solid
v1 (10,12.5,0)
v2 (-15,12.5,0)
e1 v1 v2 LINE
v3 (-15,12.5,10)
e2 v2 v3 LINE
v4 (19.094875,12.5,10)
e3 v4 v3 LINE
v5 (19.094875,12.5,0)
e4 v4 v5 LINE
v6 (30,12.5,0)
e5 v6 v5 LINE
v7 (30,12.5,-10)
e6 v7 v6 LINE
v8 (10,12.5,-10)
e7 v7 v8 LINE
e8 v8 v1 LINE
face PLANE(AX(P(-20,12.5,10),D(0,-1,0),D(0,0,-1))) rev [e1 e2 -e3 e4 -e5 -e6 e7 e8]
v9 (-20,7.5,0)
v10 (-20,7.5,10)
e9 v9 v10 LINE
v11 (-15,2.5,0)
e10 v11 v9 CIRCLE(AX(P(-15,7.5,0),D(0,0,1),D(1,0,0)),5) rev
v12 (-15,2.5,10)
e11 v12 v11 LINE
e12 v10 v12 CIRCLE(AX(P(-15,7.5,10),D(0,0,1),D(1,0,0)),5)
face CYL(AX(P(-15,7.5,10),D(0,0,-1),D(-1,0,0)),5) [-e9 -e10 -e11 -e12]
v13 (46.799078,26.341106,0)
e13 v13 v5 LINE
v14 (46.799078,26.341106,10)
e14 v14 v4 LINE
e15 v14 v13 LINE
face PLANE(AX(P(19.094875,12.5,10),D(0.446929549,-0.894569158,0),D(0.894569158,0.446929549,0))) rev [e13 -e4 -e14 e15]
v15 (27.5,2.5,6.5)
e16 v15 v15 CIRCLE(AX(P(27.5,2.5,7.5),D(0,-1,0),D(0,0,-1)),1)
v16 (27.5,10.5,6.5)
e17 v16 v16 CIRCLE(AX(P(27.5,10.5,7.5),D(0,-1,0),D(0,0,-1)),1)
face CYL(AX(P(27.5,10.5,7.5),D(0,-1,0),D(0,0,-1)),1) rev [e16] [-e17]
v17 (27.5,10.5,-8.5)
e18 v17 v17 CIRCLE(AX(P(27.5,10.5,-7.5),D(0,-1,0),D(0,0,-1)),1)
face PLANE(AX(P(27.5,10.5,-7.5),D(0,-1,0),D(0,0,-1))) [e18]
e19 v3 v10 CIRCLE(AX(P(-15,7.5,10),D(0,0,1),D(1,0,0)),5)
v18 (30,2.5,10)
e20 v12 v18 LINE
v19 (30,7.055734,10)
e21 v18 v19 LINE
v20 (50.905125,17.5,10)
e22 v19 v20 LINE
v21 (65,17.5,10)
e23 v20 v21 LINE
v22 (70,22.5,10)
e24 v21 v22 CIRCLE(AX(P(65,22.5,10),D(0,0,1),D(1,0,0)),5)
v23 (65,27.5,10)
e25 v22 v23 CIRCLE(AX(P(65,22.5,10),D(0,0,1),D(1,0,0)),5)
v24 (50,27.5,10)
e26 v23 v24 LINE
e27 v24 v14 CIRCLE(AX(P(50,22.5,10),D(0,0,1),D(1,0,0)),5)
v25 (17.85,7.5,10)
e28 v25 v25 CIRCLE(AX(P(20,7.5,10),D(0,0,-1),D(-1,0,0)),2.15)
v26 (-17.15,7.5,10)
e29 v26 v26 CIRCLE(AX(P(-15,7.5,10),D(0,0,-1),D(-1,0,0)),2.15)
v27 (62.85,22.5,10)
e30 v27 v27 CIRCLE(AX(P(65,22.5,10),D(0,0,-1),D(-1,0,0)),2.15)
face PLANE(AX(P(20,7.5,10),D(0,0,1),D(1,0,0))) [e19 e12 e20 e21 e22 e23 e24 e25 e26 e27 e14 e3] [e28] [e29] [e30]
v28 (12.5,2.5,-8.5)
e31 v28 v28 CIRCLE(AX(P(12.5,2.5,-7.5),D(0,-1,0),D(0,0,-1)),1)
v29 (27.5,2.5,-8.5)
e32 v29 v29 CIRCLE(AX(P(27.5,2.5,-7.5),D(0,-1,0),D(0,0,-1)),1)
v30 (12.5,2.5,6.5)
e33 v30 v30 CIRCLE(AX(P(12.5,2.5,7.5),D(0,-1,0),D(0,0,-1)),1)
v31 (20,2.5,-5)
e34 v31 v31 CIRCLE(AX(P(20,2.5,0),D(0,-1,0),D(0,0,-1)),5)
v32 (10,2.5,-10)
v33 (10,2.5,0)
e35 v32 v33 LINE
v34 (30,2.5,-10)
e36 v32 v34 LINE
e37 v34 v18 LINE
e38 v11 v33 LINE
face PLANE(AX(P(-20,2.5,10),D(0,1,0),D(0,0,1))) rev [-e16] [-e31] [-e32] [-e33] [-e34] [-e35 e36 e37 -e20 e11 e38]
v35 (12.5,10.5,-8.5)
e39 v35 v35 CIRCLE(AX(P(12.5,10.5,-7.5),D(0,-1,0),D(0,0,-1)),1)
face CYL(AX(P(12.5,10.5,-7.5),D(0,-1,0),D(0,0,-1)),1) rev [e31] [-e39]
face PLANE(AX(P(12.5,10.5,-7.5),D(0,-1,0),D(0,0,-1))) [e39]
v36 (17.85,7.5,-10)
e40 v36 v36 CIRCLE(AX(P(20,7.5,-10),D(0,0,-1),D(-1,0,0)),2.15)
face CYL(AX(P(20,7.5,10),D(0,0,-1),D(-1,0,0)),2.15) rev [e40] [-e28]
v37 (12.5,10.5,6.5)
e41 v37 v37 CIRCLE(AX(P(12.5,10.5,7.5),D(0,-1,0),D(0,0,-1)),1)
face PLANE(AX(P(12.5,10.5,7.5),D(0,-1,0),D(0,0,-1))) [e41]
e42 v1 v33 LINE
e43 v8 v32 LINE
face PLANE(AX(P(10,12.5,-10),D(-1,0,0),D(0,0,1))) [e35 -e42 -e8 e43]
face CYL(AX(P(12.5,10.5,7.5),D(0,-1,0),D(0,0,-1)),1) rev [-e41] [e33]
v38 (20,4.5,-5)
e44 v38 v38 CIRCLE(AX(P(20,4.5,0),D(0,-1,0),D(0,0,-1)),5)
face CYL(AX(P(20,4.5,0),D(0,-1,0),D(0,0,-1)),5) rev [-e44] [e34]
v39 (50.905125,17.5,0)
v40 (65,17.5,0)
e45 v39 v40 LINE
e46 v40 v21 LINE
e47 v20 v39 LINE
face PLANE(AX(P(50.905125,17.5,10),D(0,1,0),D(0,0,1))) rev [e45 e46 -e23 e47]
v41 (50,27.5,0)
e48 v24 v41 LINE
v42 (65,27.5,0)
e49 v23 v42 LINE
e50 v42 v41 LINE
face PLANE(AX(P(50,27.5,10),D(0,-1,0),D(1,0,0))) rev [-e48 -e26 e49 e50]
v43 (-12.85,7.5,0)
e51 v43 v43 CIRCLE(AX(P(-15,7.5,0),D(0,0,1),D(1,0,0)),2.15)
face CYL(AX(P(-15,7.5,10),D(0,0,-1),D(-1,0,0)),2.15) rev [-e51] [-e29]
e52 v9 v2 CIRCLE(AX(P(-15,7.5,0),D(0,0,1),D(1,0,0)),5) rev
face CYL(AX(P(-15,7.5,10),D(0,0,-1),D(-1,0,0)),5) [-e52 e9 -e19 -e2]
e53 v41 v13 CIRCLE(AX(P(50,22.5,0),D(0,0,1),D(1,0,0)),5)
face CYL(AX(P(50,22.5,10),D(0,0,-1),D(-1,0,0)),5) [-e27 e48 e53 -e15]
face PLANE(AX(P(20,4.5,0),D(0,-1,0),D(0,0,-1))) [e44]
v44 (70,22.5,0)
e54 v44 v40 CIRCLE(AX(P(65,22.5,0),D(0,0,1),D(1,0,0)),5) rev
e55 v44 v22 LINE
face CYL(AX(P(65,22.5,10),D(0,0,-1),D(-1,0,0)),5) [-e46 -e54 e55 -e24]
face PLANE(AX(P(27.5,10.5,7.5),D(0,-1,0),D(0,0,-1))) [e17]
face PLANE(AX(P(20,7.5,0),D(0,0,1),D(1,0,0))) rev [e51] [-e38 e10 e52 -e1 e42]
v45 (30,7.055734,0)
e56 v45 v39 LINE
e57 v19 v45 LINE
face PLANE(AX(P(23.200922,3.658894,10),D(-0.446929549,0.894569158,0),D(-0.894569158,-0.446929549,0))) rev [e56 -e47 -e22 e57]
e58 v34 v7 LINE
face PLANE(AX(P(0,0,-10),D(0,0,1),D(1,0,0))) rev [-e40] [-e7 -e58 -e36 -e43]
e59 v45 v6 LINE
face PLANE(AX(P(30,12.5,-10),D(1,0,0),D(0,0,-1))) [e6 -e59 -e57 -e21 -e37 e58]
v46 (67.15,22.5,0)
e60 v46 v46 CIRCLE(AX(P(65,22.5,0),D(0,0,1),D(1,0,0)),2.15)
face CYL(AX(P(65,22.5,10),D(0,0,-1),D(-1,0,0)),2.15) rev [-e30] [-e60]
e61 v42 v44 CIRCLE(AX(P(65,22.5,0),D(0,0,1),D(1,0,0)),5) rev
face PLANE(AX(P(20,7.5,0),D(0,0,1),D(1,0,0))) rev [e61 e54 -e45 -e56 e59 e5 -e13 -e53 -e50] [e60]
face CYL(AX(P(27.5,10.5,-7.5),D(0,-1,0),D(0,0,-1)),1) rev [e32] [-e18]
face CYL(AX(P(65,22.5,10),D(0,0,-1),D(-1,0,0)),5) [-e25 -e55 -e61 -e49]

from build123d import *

# Parameters (mm, degrees)
EXTRUDE_1_DEPTH     = 10
SKETCH_3_W          = 20
SKETCH_3_H          = 10
EXTRUDE_2_DEPTH     = 20
FILLET_1_R          = 5
SKETCH_5_R          = 2.15
CUT_EXTRUDE_2_DEPTH = 78.821912081
SKETCH_9_R          = 1
CUT_EXTRUDE_4_DEPTH = 8
SKETCH_10_R         = 5
CUT_EXTRUDE_8_DEPTH = 2


with BuildPart() as part:
    # 스케치2 → 보스-돌출1 (new body)
    with BuildSketch(Plane.XY):
        with BuildLine():
            Line((70, 27.5), (70, 17.5))
            Line((70, 17.5), (50.905124838, 17.5))
            Line((50.905124838, 17.5), (23.200921998, 3.658893602))
            ThreePointArc((23.200921998, 3.658893602), (21.702126319, 2.798642112), (20, 2.5))
            Line((20, 2.5), (-20, 2.5))
            Line((-20, 2.5), (-20, 12.5))
            Line((-20, 12.5), (19.094875162, 12.5))
            Line((19.094875162, 12.5), (46.799078002, 26.341106398))
            ThreePointArc((46.799078002, 26.341106398), (48.297873681, 27.201357888), (50, 27.5))
            Line((50, 27.5), (70, 27.5))
        make_face()
    extrude(amount=EXTRUDE_1_DEPTH)

    # 스케치3 → 보스-돌출2 (add)
    with BuildSketch(Plane.XY.offset(10)):
        with Locations((19.999999999, 7.5)):
            Rectangle(SKETCH_3_W, SKETCH_3_H)
    extrude(amount=-EXTRUDE_2_DEPTH)

    # 필렛1
    fillet_1_edges = [part.edges().sort_by_distance(p)[0] for p in [
        (-20, 12.5, 5),
        (-20, 2.5, 5),
        (70, 17.5, 5),
        (70, 27.5, 5),
    ]]
    fillet(fillet_1_edges, radius=FILLET_1_R - 0.0001)  # a hair under: the kernel refuses the full size

    # 스케치5 → 컷-돌출2 (cut, through all)
    with BuildSketch(Plane(origin=(0, 0, -10), x_dir=(-1, 0, 0), z_dir=(0, 0, -1))):
        with Locations((-19.999999999, 7.5)):
            Circle(SKETCH_5_R)
        with Locations((-65, 22.5)):
            Circle(SKETCH_5_R)
        with Locations((15, 7.5)):
            Circle(SKETCH_5_R)
    extrude(amount=-CUT_EXTRUDE_2_DEPTH, mode=Mode.SUBTRACT)

    # 스케치9 → 컷-돌출4 (cut)
    with BuildSketch(Plane.XZ.offset(-2.5)):
        with Locations(Location((12.499999999, 7.5, 0), (0, 0, 270))):
            Circle(SKETCH_9_R)
        with Locations(Location((27.499999999, 7.5, 0), (0, 0, 270))):
            Circle(SKETCH_9_R)
        with Locations(Location((12.499999999, -7.5, 0), (0, 0, 270))):
            Circle(SKETCH_9_R)
        with Locations(Location((27.499999999, -7.5, 0), (0, 0, 270))):
            Circle(SKETCH_9_R)
    extrude(amount=-CUT_EXTRUDE_4_DEPTH, mode=Mode.SUBTRACT)

    # 스케치10 → 컷-돌출8 (cut)
    with BuildSketch(Plane.XZ.offset(-2.5)):
        with Locations(Location((19.999999999, 0, 0), (0, 0, 270))):
            Circle(SKETCH_10_R)
    extrude(amount=-CUT_EXTRUDE_8_DEPTH, mode=Mode.SUBTRACT)


solid = part.part
